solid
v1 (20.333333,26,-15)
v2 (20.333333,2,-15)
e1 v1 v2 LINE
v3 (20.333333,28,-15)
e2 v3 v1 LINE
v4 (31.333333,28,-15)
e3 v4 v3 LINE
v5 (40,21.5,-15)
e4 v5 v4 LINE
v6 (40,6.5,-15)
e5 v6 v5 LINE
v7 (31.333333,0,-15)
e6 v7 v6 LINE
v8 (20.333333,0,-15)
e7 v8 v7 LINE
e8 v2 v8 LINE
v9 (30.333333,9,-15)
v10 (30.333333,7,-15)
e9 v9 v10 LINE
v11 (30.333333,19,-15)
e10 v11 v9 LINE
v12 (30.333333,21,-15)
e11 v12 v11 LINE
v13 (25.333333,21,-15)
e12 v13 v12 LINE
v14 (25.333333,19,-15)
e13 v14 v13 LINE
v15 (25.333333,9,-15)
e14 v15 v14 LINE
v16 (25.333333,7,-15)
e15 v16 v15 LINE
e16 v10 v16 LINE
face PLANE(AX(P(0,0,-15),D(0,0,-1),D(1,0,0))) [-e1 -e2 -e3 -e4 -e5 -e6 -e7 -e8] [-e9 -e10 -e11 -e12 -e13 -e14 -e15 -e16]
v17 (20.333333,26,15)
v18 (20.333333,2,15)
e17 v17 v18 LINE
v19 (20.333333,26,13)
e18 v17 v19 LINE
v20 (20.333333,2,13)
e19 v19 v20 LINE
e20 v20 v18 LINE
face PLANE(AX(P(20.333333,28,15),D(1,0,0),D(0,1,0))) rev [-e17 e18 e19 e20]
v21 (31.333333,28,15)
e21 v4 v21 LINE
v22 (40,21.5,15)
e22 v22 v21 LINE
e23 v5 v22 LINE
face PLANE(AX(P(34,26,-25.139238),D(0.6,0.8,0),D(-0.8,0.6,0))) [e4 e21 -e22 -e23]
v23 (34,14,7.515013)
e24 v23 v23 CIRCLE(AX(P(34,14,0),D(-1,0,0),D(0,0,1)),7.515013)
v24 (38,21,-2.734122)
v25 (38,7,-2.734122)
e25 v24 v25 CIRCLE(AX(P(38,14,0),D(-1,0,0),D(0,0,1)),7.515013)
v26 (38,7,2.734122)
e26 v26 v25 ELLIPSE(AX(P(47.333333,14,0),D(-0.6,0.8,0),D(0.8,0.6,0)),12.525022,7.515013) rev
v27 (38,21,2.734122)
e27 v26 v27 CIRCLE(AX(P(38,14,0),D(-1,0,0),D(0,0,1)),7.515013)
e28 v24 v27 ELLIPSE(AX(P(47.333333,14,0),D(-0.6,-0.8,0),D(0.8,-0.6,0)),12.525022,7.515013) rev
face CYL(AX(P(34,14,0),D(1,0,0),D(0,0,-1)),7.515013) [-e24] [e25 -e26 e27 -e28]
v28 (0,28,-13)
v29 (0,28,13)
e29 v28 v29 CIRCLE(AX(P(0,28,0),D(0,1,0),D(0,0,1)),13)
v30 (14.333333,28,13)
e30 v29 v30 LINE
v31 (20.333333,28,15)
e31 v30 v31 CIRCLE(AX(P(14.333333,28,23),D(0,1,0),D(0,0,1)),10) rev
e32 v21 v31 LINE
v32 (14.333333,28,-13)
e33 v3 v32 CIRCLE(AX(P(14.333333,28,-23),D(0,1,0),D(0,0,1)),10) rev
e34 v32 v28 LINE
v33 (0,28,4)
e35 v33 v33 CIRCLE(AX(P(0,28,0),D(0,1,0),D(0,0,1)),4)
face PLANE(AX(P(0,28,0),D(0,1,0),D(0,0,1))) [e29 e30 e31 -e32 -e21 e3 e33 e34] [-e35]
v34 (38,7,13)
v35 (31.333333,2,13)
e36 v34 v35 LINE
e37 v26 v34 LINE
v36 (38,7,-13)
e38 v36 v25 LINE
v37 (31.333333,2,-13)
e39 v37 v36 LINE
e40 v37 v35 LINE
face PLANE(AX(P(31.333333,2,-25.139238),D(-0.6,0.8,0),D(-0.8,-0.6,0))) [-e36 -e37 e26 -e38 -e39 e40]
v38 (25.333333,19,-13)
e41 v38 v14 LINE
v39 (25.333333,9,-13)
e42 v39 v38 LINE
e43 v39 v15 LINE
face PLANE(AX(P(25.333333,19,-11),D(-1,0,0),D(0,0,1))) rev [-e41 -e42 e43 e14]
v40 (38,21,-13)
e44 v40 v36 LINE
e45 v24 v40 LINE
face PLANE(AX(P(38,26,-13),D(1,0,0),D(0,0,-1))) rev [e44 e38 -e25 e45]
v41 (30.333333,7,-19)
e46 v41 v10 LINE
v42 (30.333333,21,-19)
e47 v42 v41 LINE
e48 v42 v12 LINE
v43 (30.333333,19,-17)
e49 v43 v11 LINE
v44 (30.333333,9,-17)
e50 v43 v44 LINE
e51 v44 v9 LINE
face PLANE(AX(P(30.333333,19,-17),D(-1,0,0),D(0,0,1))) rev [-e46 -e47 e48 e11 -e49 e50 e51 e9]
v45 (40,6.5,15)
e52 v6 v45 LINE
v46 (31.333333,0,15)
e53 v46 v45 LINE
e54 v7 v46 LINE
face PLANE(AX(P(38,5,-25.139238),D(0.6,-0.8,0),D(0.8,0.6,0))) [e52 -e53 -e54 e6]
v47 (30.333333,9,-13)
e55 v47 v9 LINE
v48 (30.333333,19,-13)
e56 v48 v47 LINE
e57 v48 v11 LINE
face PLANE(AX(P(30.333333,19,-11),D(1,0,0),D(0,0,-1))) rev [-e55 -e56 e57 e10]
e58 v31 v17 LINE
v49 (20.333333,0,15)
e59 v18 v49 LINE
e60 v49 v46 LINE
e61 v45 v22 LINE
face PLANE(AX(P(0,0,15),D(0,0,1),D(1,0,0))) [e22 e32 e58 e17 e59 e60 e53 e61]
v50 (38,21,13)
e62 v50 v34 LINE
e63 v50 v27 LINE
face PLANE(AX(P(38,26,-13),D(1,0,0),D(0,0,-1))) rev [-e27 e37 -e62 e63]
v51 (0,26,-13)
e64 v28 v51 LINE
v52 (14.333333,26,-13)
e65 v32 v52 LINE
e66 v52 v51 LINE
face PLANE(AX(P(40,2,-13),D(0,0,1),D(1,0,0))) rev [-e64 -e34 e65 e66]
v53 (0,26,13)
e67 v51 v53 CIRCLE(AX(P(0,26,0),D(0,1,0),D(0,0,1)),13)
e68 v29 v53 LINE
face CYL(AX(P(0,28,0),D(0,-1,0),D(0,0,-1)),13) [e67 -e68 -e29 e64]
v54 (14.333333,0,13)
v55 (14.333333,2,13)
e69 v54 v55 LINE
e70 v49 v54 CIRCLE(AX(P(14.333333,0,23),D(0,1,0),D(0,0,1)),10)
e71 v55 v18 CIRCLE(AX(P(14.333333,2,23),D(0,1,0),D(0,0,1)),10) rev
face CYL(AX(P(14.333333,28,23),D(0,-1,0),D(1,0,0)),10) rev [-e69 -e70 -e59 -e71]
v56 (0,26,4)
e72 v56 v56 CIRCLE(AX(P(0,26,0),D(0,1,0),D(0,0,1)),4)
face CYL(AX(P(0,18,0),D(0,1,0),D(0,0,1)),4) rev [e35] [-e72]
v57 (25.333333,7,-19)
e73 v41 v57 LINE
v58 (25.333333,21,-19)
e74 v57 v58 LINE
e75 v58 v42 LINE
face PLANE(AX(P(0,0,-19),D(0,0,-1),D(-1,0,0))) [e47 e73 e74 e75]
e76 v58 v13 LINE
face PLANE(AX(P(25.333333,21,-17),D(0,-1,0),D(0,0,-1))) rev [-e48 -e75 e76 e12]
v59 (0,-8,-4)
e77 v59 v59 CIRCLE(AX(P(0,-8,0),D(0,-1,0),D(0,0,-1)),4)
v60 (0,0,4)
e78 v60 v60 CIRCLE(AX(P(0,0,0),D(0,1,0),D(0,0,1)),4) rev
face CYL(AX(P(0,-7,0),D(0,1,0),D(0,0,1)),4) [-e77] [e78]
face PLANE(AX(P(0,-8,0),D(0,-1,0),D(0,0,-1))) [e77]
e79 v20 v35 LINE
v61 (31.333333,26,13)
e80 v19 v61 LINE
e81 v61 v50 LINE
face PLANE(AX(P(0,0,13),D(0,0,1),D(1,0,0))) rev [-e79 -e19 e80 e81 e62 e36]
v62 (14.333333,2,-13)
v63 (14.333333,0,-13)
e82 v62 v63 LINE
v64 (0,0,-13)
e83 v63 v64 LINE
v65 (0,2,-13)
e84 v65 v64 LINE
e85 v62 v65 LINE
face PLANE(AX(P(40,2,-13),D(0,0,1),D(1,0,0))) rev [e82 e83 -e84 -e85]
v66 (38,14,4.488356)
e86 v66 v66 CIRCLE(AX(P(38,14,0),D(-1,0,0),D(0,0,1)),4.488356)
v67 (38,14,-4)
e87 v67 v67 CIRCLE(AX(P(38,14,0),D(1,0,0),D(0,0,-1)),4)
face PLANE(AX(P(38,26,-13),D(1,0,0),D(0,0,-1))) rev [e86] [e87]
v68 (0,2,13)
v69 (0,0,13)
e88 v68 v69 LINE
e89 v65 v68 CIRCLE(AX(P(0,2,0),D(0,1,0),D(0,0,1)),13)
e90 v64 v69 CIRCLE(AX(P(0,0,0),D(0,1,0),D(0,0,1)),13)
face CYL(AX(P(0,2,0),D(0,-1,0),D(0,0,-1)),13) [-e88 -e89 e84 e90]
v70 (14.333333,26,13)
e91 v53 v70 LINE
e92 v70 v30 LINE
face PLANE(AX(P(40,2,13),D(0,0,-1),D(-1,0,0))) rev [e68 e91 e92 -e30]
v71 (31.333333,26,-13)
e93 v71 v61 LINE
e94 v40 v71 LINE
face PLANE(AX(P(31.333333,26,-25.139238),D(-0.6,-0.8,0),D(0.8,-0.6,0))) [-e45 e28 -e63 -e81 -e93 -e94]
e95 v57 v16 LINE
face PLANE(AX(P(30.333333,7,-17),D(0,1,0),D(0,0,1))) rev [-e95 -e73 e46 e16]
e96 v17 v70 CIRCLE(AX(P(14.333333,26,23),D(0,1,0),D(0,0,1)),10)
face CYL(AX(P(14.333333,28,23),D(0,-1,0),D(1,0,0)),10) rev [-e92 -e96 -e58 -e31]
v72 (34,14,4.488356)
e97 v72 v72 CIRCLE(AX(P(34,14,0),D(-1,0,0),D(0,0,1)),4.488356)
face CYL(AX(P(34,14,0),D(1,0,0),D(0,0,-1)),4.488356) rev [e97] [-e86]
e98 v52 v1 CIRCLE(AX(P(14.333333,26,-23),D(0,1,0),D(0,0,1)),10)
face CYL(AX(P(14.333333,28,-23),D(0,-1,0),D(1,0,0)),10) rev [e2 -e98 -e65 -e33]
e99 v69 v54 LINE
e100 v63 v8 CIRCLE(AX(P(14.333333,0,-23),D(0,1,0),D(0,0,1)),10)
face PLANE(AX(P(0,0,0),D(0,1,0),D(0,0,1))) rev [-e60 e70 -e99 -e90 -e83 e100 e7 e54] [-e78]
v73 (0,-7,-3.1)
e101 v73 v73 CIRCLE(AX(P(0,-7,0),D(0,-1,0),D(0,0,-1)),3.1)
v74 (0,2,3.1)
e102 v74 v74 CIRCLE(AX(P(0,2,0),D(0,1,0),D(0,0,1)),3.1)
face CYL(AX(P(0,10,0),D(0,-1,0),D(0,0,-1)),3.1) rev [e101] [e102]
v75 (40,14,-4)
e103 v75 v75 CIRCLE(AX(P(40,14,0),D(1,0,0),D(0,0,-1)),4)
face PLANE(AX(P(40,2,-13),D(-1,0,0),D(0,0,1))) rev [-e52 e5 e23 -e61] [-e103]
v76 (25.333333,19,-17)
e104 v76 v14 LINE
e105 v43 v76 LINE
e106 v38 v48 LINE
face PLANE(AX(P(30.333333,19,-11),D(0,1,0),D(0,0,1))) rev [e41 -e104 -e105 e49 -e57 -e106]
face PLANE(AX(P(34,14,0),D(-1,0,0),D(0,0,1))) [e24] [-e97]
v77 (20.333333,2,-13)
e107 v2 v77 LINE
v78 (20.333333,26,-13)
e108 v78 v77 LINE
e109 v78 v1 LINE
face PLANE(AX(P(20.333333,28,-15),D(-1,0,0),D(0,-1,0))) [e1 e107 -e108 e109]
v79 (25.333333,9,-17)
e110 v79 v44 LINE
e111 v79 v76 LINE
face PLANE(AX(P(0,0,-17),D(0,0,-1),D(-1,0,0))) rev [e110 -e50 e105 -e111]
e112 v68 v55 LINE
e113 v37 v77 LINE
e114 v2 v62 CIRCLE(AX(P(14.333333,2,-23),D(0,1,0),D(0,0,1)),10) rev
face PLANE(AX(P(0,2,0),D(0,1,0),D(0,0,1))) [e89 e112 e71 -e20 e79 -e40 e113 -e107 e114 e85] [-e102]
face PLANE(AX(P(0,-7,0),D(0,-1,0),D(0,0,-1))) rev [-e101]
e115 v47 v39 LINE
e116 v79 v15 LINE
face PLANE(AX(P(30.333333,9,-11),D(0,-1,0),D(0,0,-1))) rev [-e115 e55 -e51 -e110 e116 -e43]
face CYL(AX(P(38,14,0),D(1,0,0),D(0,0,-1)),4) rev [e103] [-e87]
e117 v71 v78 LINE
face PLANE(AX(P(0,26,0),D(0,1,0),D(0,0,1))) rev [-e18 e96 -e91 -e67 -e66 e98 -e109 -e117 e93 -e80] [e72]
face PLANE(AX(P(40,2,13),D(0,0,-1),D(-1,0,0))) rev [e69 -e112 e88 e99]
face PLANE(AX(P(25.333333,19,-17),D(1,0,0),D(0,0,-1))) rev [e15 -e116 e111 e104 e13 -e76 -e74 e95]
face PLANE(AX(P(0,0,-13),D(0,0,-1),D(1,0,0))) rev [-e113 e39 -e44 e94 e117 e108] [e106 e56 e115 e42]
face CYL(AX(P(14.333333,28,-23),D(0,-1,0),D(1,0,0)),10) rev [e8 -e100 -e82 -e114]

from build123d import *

# Parameters (mm, degrees)
BOSS_EXTRUDE1_DEPTH  = 2
SKETCH2_W            = 2
SKETCH2_H            = 26
BOSS_EXTRUDE2_DEPTH  = 24
BOSS_EXTRUDE3_DEPTH  = 2
SKETCH4_R            = 4
CUT_EXTRUDE1_DEPTH   = 2
BOSS_EXTRUDE4_DEPTH  = 26
CUT_EXTRUDE2_DEPTH   = 26
BOSS_EXTRUDE5_DEPTH  = 2
SKETCH8_R            = 7.515013345
SKETCH8_R_2          = 4.48835621
BOSS_EXTRUDE6_DEPTH  = 4
SKETCH9_R            = 3.1
CUT_EXTRUDE3_DEPTH   = 10
SKETCH10_R           = 4
CUT_EXTRUDE4_DEPTH   = 10
SKETCH11_R           = 4
SKETCH11_R_2         = 3.1
BOSS_EXTRUDE7_DEPTH  = 7
SKETCH12_R           = 4
BOSS_EXTRUDE8_DEPTH  = 1
SKETCH13_W           = 5
SKETCH13_H           = 10
CUT_EXTRUDE5_DEPTH   = 10
SKETCH14_W           = 5
SKETCH14_H           = 10
CUT_EXTRUDE6_DEPTH   = 4
SKETCH15_W           = 5
SKETCH15_H           = 10
BOSS_EXTRUDE9_DEPTH  = 2
SKETCH16_W           = 5
SKETCH16_H           = 2
BOSS_EXTRUDE10_DEPTH = 2
SKETCH17_W           = 5
SKETCH17_H           = 14
BOSS_EXTRUDE11_DEPTH = 2
FILLET1_R            = 10


with BuildPart() as part:
    # Sketch1 → Boss-Extrude1 (new body)
    with BuildSketch(Plane(origin=(0, 0, 0), x_dir=(1, 0, 0), z_dir=(0, 1, 0))):
        with BuildLine():
            Line((40, 13), (0, 13))
            ThreePointArc((0, 13), (-13, 0), (0, -13))
            Line((0, -13), (40, -13))
            Line((40, -13), (40, 13))
        make_face()
    extrude(amount=BOSS_EXTRUDE1_DEPTH)

    # Sketch2 → Boss-Extrude2 (add)
    with BuildSketch(Plane(origin=(0, 2, 0), x_dir=(1, 0, 0), z_dir=(0, 1, 0))):
        with Locations((39, 0)):
            Rectangle(SKETCH2_W, SKETCH2_H)
    extrude(amount=BOSS_EXTRUDE2_DEPTH)

    # Sketch3 → Boss-Extrude3 (add)
    with BuildSketch(Plane(origin=(0, 26, 0), x_dir=(1, 0, 0), z_dir=(0, 1, 0))):
        with BuildLine():
            Line((40, -13), (0, -13))
            ThreePointArc((0, -13), (-13, 0), (0, 13))
            Line((0, 13), (40, 13))
            Line((40, 13), (40, -13))
        make_face()
    extrude(amount=BOSS_EXTRUDE3_DEPTH)

    # Sketch4 → Cut-Extrude1 (cut)
    with BuildSketch(Plane(origin=(40, 0, 0), x_dir=(0, 0, -1), z_dir=(1, 0, 0))):
        with Locations((0, 14)):
            Circle(SKETCH4_R)
    extrude(amount=-CUT_EXTRUDE1_DEPTH, mode=Mode.SUBTRACT)

    # Sketch5 → Boss-Extrude4 (add)
    with BuildSketch(Plane.XY.offset(13)):
        Polygon((38, 5), (34, 2), (31.333333333, 0), (31.333333333, 2), (40, 8.5), (40, 6.5), align=None)
        Polygon((40, 21.5), (38, 23), (34, 26), (31.333333333, 28), (31.333333333, 26), (40, 19.5), align=None)
    extrude(amount=-BOSS_EXTRUDE4_DEPTH)

    # Sketch6 → Cut-Extrude2 (cut)
    with BuildSketch(Plane.XY.offset(13)):
        Polygon((38, 5), (31.333333333, 0), (40, 0), (40, 6.5), align=None)
        Polygon((40, 28), (40, 21.5), (38, 23), (31.333333333, 28), align=None)
    extrude(amount=-CUT_EXTRUDE2_DEPTH, mode=Mode.SUBTRACT)

    # Sketch7 → Boss-Extrude5 (add)
    with BuildSketch(Plane.XY.offset(13)):
        Polygon((40, 21.5), (31.333333333, 28), (20.333333333, 28), (20.333333333, 0), (31.333333333, 0), (40, 6.5), align=None)
    boss_extrude5 = extrude(amount=BOSS_EXTRUDE5_DEPTH)

    # Mirror1: Boss-Extrude5 across plane
    add(boss_extrude5.mirror(Plane.XY))

    # Sketch8 → Boss-Extrude6 (add)
    with BuildSketch(Plane.ZY.offset(-38)):
        with Locations(Location((0, 14, 0), (0, 0, 111.335065793))):
            Circle(SKETCH8_R)
        with Locations((0, 14)):
            Circle(SKETCH8_R_2, mode=Mode.SUBTRACT)
    extrude(amount=BOSS_EXTRUDE6_DEPTH)

    # Sketch9 → Cut-Extrude3 (cut)
    with BuildSketch(Plane.XZ):
        with Locations(Location((0, 0, 0), (0, 0, 270))):
            Circle(SKETCH9_R)
    extrude(amount=-CUT_EXTRUDE3_DEPTH, mode=Mode.SUBTRACT)

    # Sketch10 → Cut-Extrude4 (cut)
    with BuildSketch(Plane(origin=(0, 28, 0), x_dir=(1, 0, 0), z_dir=(0, 1, 0))):
        with Locations(Location((0, 0, 0), (0, 0, 270))):
            Circle(SKETCH10_R)
    extrude(amount=-CUT_EXTRUDE4_DEPTH, mode=Mode.SUBTRACT)

    # Sketch11 → Boss-Extrude7 (add)
    with BuildSketch(Plane.XZ):
        with Locations(Location((0, 0, 0), (0, 0, 90))):
            Circle(SKETCH11_R)
        with Locations(Location((0, 0, 0), (0, 0, 270))):
            Circle(SKETCH11_R_2, mode=Mode.SUBTRACT)
    extrude(amount=BOSS_EXTRUDE7_DEPTH)

    # Sketch12 → Boss-Extrude8 (add)
    with BuildSketch(Plane.XZ.offset(7)):
        with Locations(Location((0, 0, 0), (0, 0, 90))):
            Circle(SKETCH12_R)
    extrude(amount=BOSS_EXTRUDE8_DEPTH)

    # Sketch13 → Cut-Extrude5 (cut)
    with BuildSketch(Plane.XY.offset(15)):
        with Locations((27.833333333, 14)):
            Rectangle(SKETCH13_W, SKETCH13_H)
    extrude(amount=-CUT_EXTRUDE5_DEPTH, mode=Mode.SUBTRACT)

    # Sketch14 → Cut-Extrude6 (cut)
    with BuildSketch(Plane(origin=(0, 0, -15), x_dir=(-1, 0, 0), z_dir=(0, 0, -1))):
        with Locations((-27.833333333, 14)):
            Rectangle(SKETCH14_W, SKETCH14_H)
    extrude(amount=-CUT_EXTRUDE6_DEPTH, mode=Mode.SUBTRACT)

    # Sketch15 → Boss-Extrude9 (add)
    with BuildSketch(Plane.XY.offset(15)):
        with Locations((27.833333333, 14)):
            Rectangle(SKETCH15_W, SKETCH15_H)
    extrude(amount=-BOSS_EXTRUDE9_DEPTH)

    # Sketch16 → Boss-Extrude10 (add)
    with BuildSketch(Plane(origin=(0, 0, -15), x_dir=(-1, 0, 0), z_dir=(0, 0, -1))):
        with Locations((-27.833333333, 20)):
            Rectangle(SKETCH16_W, SKETCH16_H)
        with Locations((-27.833333333, 8)):
            Rectangle(SKETCH16_W, SKETCH16_H)
    extrude(amount=BOSS_EXTRUDE10_DEPTH)

    # Sketch17 → Boss-Extrude11 (add)
    with BuildSketch(Plane(origin=(0, 0, -17), x_dir=(-1, 0, 0), z_dir=(0, 0, -1))):
        with Locations((-27.833333333, 14)):
            Rectangle(SKETCH17_W, SKETCH17_H)
    extrude(amount=BOSS_EXTRUDE11_DEPTH)

    # Fillet1
    # the kernel refuses this fillet: 10 mm, written as the material it adds along each edge
    with BuildSketch(Plane(origin=(20.333333333, 28, 13), x_dir=(0, 0, 1), z_dir=(0, -1, 0))) as fillet1_piece_1:
        with BuildLine():
            CenterArc((10, 6), FILLET1_R, 180, 36.869897646)
            Line((0, 6), (0, 0))
            Line((0, 0), (2, 0))
        make_face()
    extrude(amount=2)
    with BuildSketch(Plane(origin=(20.333333333, 2, 13), x_dir=(-1, 0, 0), z_dir=(0, -1, 0))) as fillet1_piece_2:
        with BuildLine():
            CenterArc((6, -10), FILLET1_R, 90, 36.869897646)
            Line((0, -2), (0, 0))
            Line((0, 0), (6, 0))
        make_face()
    extrude(amount=2)
    with BuildSketch(Plane(origin=(20.333333333, 2, -13), x_dir=(-1, 0, 0), z_dir=(0, -1, 0))) as fillet1_piece_3:
        with BuildLine():
            CenterArc((6, 10), FILLET1_R, 233.130102354, 36.869897646)
            Line((0, 2), (0, 0))
            Line((0, 0), (6, 0))
        make_face()
    extrude(amount=2)
    with BuildSketch(Plane(origin=(20.333333333, 28, -13), x_dir=(0, 0, -1), z_dir=(0, -1, 0))) as fillet1_piece_4:
        with BuildLine():
            CenterArc((10, -6), FILLET1_R, 143.130102354, 36.869897646)
            Line((0, -6), (0, 0))
            Line((0, 0), (2, 0))
        make_face()
    extrude(amount=2)


solid = part.part
